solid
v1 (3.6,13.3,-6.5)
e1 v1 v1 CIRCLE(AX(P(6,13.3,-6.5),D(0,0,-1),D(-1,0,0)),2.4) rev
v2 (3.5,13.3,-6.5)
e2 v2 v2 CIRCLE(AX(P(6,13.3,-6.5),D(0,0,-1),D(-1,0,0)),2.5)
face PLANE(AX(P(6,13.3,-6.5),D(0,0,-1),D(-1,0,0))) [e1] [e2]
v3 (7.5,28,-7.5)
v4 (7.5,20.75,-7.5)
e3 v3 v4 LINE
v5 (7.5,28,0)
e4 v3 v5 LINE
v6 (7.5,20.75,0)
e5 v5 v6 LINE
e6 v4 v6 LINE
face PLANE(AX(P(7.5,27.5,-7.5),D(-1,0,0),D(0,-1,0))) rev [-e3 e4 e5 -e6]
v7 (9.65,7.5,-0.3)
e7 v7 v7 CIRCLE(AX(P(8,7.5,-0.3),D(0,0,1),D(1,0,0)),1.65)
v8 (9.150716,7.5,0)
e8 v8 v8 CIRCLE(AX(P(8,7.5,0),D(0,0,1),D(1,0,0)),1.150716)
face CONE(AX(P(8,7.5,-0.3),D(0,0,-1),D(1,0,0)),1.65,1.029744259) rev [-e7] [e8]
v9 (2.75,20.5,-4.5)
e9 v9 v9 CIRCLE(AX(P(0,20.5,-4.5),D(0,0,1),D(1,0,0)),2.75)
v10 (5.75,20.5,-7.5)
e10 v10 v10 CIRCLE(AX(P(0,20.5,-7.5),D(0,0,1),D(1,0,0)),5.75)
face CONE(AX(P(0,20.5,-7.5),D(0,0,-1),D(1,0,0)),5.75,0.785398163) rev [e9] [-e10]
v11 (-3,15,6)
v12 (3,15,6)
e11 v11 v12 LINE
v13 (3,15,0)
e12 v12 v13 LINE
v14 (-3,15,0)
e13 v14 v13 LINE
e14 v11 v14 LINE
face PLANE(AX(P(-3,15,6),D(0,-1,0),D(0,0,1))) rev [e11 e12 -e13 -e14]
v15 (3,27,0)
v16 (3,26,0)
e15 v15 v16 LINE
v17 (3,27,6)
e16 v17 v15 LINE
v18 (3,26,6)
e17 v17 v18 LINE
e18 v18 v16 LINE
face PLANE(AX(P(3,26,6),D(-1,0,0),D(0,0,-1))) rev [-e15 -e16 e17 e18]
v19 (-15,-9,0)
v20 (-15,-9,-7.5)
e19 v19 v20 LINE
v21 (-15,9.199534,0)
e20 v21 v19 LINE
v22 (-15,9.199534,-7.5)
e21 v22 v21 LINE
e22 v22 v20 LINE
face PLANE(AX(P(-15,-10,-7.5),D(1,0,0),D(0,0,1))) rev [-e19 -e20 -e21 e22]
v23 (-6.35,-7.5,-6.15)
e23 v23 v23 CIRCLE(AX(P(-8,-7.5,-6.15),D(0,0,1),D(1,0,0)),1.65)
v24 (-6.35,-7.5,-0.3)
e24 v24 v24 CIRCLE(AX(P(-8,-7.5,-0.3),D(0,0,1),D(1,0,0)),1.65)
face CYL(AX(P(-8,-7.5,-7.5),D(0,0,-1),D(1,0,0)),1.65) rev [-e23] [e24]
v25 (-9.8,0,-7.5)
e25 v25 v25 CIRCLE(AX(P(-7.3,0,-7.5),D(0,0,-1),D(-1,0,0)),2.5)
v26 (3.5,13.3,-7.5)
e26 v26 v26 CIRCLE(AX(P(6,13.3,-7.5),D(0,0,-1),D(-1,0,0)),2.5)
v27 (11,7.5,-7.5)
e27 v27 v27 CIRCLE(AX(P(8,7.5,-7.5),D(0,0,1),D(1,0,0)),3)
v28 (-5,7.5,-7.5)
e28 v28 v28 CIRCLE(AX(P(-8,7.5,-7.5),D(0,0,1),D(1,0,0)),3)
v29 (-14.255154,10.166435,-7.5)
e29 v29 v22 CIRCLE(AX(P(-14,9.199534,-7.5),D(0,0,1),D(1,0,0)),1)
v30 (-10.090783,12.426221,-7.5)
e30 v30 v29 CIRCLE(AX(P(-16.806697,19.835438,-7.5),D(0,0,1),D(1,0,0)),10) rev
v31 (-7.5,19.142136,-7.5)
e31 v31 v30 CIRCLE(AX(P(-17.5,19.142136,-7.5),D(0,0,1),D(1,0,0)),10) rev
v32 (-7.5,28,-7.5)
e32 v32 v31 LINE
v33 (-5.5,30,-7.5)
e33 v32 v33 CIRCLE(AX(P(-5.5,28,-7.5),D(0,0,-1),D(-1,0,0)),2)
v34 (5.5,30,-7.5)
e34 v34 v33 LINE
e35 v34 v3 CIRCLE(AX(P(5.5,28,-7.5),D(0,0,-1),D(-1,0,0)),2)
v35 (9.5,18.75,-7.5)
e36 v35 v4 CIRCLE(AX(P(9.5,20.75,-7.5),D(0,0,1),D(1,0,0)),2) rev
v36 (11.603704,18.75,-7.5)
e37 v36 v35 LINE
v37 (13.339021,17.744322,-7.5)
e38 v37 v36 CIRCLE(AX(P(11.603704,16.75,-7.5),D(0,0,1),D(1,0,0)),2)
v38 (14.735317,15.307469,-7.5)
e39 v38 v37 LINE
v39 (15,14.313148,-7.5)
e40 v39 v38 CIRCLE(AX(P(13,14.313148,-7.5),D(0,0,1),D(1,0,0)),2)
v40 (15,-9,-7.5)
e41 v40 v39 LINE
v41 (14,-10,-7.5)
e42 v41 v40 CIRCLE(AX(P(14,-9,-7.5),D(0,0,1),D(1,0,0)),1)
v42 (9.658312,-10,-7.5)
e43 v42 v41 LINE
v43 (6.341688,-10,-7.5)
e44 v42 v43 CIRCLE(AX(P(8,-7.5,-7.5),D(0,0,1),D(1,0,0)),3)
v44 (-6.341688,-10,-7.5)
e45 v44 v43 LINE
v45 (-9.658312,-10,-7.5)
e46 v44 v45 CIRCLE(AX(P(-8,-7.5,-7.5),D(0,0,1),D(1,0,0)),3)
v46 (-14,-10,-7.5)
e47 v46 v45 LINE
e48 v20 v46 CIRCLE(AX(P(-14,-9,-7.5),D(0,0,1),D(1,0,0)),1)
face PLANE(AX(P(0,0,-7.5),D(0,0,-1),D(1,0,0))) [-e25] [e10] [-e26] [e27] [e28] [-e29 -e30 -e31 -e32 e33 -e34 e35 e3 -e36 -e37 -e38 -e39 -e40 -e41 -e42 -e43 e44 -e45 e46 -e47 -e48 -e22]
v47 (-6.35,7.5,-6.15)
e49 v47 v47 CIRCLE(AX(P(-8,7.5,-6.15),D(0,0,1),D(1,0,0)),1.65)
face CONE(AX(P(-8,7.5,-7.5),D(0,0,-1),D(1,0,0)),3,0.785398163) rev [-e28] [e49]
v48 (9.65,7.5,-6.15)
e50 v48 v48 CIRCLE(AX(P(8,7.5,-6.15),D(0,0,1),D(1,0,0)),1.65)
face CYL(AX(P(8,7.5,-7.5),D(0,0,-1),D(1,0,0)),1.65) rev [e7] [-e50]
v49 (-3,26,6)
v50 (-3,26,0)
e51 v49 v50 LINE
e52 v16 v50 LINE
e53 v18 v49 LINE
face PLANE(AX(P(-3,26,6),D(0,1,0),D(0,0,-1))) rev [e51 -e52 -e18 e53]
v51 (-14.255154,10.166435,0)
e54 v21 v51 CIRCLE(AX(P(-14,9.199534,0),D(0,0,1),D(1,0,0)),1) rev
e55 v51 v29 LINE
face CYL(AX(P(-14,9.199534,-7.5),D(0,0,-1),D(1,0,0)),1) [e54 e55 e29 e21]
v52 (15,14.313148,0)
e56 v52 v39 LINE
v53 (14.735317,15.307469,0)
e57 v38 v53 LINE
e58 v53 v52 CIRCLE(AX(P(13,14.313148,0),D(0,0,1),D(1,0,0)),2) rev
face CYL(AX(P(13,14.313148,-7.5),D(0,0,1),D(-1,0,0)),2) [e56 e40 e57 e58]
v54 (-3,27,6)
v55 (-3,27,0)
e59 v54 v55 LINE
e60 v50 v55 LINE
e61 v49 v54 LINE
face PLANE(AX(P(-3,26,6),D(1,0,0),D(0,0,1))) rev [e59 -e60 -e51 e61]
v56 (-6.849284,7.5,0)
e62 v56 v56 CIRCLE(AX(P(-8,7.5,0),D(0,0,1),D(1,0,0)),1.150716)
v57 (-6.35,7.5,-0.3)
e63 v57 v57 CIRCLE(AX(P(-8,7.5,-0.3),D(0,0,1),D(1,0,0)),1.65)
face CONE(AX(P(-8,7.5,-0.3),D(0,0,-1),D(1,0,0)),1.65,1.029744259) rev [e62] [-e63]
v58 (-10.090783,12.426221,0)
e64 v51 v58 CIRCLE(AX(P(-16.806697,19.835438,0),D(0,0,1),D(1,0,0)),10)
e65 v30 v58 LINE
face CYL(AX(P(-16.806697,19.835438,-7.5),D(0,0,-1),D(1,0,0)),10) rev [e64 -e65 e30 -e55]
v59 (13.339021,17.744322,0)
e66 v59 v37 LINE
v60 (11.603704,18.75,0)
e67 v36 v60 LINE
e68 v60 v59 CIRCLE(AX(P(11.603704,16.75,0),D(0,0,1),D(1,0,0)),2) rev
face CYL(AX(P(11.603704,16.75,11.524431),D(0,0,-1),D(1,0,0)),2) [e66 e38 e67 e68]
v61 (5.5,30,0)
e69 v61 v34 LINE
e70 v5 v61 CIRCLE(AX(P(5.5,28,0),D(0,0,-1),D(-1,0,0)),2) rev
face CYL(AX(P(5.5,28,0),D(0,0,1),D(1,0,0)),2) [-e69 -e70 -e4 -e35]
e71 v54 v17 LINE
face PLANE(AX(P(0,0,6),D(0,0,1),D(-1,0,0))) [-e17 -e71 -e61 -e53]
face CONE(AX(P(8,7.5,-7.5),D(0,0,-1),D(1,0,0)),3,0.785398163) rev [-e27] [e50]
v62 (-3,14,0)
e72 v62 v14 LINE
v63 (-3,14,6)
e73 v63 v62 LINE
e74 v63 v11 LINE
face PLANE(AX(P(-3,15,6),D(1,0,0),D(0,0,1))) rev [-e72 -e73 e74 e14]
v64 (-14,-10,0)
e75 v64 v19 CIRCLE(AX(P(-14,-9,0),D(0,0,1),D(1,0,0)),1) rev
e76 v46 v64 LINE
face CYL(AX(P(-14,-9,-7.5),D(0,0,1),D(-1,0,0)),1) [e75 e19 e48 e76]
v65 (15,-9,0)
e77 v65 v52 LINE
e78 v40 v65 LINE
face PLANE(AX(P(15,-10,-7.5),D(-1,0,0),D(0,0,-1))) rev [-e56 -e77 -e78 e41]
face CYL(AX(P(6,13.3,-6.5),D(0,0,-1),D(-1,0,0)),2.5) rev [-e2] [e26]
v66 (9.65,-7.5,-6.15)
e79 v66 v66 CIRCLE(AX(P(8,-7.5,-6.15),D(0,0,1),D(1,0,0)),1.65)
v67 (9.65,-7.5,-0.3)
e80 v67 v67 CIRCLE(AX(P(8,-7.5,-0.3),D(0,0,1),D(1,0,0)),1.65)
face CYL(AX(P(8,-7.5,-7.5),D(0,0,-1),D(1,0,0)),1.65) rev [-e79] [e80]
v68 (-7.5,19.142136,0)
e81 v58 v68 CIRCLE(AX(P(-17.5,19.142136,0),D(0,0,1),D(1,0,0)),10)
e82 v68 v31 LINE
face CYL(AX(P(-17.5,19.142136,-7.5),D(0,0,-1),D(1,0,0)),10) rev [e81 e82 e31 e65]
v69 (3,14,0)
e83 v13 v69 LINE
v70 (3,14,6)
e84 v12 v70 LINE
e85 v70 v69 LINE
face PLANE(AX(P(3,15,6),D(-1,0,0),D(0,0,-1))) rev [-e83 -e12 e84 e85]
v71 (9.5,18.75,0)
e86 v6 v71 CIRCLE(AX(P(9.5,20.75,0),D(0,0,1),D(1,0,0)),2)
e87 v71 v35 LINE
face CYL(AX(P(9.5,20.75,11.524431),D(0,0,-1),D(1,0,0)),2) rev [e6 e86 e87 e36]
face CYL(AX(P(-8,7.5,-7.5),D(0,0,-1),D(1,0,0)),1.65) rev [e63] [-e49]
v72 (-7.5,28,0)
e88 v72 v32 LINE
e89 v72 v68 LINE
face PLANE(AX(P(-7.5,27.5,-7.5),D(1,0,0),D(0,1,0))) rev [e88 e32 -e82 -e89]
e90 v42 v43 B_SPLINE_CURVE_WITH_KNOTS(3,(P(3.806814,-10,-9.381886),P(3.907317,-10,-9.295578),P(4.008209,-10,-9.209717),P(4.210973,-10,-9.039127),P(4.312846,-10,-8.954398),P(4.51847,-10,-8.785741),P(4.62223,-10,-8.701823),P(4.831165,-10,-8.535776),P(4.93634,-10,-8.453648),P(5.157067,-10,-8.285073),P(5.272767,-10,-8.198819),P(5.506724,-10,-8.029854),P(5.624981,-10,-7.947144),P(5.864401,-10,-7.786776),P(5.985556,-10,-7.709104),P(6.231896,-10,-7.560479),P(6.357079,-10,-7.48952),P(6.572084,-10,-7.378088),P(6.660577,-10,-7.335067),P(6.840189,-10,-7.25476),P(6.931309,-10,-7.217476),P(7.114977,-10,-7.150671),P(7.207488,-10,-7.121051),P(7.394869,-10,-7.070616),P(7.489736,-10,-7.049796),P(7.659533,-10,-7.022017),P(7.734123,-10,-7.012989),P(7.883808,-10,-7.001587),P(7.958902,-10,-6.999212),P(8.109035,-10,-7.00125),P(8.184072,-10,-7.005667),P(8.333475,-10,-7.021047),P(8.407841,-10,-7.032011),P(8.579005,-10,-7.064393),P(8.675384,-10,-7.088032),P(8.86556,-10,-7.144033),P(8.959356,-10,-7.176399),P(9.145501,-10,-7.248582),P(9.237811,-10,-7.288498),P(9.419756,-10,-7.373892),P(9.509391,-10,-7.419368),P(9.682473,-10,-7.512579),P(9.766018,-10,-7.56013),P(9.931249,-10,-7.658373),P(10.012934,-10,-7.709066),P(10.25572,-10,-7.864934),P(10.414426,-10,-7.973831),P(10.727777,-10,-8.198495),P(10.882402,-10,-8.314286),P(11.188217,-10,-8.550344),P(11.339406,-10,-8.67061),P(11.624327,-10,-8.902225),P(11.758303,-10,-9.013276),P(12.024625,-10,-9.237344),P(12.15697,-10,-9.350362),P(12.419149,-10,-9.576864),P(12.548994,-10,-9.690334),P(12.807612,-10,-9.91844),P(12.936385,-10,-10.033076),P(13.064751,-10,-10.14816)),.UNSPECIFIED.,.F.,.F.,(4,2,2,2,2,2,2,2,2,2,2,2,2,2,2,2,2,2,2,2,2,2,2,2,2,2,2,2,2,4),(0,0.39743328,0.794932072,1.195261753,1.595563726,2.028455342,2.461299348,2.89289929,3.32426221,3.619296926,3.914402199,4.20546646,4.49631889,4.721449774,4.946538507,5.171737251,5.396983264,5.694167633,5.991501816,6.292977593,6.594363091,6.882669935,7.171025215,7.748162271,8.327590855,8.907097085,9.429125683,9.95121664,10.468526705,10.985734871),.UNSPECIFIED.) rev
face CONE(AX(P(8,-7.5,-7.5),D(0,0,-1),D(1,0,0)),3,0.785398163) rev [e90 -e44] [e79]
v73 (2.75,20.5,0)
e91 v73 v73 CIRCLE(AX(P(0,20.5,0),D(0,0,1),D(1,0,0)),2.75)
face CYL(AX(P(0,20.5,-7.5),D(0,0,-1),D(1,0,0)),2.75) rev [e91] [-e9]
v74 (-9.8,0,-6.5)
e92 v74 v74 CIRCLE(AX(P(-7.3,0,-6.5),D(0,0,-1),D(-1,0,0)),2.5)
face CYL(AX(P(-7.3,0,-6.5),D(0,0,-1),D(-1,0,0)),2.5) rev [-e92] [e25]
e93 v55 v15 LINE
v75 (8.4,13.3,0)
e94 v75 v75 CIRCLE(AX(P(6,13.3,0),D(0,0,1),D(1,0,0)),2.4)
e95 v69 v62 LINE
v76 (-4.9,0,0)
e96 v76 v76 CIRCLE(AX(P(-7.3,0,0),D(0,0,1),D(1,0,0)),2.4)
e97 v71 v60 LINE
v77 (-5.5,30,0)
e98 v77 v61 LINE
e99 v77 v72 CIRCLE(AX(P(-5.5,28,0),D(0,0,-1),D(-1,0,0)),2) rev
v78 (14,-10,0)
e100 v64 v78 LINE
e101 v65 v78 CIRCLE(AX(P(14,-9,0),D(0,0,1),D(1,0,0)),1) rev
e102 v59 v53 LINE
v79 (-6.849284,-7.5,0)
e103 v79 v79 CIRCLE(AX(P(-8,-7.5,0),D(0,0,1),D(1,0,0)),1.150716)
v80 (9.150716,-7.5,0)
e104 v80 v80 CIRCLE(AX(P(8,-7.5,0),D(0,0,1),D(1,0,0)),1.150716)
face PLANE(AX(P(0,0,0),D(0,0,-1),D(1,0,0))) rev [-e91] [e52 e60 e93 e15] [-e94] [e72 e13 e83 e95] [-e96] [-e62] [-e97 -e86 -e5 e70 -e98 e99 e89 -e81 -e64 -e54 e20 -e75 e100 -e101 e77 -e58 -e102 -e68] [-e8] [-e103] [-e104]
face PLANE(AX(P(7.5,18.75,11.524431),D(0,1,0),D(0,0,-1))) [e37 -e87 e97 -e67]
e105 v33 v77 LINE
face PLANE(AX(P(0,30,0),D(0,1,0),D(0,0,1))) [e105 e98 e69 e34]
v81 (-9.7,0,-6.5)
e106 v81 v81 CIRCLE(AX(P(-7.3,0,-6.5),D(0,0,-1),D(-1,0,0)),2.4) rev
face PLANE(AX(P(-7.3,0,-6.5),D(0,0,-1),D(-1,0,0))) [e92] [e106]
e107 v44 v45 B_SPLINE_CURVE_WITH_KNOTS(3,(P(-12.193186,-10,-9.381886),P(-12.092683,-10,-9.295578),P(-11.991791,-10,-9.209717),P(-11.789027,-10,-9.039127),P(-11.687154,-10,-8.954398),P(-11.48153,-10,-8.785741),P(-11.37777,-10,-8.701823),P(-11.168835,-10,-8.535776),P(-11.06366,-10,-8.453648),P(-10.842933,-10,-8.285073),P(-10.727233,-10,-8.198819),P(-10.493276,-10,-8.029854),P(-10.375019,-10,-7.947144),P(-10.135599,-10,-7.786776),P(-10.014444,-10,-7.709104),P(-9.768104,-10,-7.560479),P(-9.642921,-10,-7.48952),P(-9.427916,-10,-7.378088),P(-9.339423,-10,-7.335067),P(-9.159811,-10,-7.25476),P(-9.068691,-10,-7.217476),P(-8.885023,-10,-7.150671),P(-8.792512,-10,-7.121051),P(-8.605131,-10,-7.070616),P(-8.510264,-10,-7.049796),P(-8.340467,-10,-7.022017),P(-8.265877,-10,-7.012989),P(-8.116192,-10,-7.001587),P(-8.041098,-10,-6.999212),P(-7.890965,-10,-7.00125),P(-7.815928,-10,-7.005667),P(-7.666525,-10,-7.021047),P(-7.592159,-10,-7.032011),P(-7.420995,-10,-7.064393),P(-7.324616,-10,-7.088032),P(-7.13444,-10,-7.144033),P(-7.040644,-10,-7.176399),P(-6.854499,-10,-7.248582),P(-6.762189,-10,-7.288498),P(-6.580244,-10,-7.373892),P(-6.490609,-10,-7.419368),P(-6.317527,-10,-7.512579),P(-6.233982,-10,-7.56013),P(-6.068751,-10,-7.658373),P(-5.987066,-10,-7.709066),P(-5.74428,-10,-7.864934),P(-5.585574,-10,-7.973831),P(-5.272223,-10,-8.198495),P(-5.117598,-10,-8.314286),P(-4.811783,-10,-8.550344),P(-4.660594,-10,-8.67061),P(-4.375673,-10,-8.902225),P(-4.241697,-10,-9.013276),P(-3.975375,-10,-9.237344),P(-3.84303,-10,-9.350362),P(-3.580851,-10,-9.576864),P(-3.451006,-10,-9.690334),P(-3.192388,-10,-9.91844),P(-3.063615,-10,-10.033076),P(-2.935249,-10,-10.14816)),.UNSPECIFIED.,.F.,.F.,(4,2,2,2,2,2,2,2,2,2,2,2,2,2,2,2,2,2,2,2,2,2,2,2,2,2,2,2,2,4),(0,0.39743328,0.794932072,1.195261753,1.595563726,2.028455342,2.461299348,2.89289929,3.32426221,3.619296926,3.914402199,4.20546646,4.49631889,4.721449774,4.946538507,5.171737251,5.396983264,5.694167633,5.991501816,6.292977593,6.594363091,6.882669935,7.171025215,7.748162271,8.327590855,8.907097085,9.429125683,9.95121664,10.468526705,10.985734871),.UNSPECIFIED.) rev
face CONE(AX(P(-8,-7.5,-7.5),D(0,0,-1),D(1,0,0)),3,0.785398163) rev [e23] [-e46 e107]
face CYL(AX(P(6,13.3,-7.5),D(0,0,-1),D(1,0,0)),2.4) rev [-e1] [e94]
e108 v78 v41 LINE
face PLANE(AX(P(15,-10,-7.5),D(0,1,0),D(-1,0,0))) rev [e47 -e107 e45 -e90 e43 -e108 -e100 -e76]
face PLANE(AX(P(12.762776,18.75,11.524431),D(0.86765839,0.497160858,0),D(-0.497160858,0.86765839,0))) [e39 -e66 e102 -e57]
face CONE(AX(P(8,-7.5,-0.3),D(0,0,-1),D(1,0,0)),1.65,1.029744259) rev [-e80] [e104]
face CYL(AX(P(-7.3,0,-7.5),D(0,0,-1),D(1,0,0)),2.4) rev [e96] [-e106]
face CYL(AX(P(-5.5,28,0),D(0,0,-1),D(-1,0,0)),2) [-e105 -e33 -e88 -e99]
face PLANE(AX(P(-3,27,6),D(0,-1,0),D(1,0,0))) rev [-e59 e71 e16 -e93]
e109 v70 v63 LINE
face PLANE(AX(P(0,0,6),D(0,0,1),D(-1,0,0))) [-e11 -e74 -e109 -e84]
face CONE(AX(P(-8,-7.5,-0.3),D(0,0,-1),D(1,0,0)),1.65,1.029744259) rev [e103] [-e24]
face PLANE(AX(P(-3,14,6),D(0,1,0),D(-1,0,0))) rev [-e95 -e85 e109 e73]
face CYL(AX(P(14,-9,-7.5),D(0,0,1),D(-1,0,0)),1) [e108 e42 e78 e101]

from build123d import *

# Parameters (mm, degrees)
SKETCH_1_W                   = 30
SKETCH_1_H                   = 20
EXTRUDE_1_DEPTH              = 7.5
SKETCH_5_W                   = 15
SKETCH_5_H                   = 7.5
EXTRUDE_2_DEPTH              = 17.5
SKETCH_6_W                   = 6
SKETCH_6_H                   = 1
EXTRUDE_3_DEPTH              = 6
HOLE_WIZARD_M6_1_D           = 5.5
HOLE_WIZARD_M6_1_CSINK_D     = 11.5
HOLE_WIZARD_M6_1_CSINK_ANGLE = 90
F_4_0MM_1_D                  = 4.8
F_4_0MM_1_DEPTH              = 7.5
F_4_0MM_1_TIP                = 1.442065486
EXTRUDE_4_DEPTH              = 7.5
F_4_0MM_2_D                  = 4.8
EXTRUDE_5_DEPTH              = 7.5
FILLET_1_R                   = 10
MOVE_BODY_1_OUTLINE_R        = 2.4
MOVE_BODY_1_OUTLINE_W        = 6
MOVE_BODY_1_OUTLINE_H        = 1
MOVE_BODY_1_OUTLINE_R_2      = 2.75
MOVE_BODY_1_DEPTH            = 7.5
MOVE_START                   = 6
MOVE_BODY_1_2_OUTLINE_W      = 6
MOVE_BODY_1_2_OUTLINE_H      = 1
MOVE_BODY_1_2_DEPTH          = 1.5
MOVE_START_2                 = -6.1500001
MOVE_BODY_1_3_OUTLINE_R      = 1.65
MOVE_BODY_1_3_OUTLINE_R_2    = 2.4
MOVE_BODY_1_3_OUTLINE_R_3    = 2.75
MOVE_BODY_1_3_DEPTH          = 6.1500001
MOVE_START_3                 = -7.5
MOVE_BODY_1_4_DEPTH          = 1.5
MOVE_BODY_1_5_OUTLINE_R      = 2.4
MOVE_BODY_1_5_OUTLINE_R_2    = 2.75
MOVE_BODY_1_5_DEPTH          = 1.3499999
MOVE_START_4                 = -0.3000001
MOVE_BODY_1_6_OUTLINE_R      = 2.4
MOVE_BODY_1_6_OUTLINE_R_2    = 2.75
MOVE_BODY_1_6_DEPTH          = 0.3000001
SKETCH_28_W                  = 15
SKETCH_28_H                  = 7.5
EXTRUDE_6_DEPTH              = 2.5
CUT_EXTRUDE_START            = -8
CUT_EXTRUDE_1_DEPTH          = 9
CUT_EXTRUDE_START_2          = -1
CUT_EXTRUDE_1_2_OUTLINE_R    = 2.5
CUT_EXTRUDE_1_2_OUTLINE_R_2  = 2.4
CUT_EXTRUDE_1_2_DEPTH        = 2


with BuildPart() as part:
    # 草图1 → 凸台-拉伸1 (new body)
    with BuildSketch(Plane.XY):
        Rectangle(SKETCH_1_W, SKETCH_1_H)
    extrude(amount=EXTRUDE_1_DEPTH)

    # 草图5 → 凸台-拉伸2 (add)
    with BuildSketch(Plane(origin=(0, 10, 0), x_dir=(1, 0, 0), z_dir=(0, 1, 0))):
        with Locations((0, -3.75)):
            Rectangle(SKETCH_5_W, SKETCH_5_H)
    extrude(amount=EXTRUDE_2_DEPTH)

    # 草图6 → 凸台-拉伸3 (add)
    with BuildSketch(Plane(origin=(0, 0, 0), x_dir=(-1, 0, 0), z_dir=(0, 0, -1))):
        with Locations((0, 26.5)):
            Rectangle(SKETCH_6_W, SKETCH_6_H)
        with Locations((0, 14.5)):
            Rectangle(SKETCH_6_W, SKETCH_6_H)
    extrude(amount=EXTRUDE_3_DEPTH)

    # M6 内六角花形半沉头螺钉的锥形沉头孔1 (through all)
    with Locations(Plane.XY.offset(7.5)):
        with Locations((0, 20.5)):
            CounterSinkHole(HOLE_WIZARD_M6_1_D / 2, HOLE_WIZARD_M6_1_CSINK_D / 2, counter_sink_angle=HOLE_WIZARD_M6_1_CSINK_ANGLE)

    # Ø4.0mm 暗销孔1
    with Locations(Plane.XY.offset(7.5)):
        with Locations((-7.3, 0)):
            Hole(F_4_0MM_1_D / 2, depth=F_4_0MM_1_DEPTH)
            with Locations((0, 0, -(F_4_0MM_1_DEPTH + F_4_0MM_1_TIP / 2))):  # 118° drill point
                Cone(0, F_4_0MM_1_D / 2, F_4_0MM_1_TIP, mode=Mode.SUBTRACT)

    # 草图15 → 凸台-拉伸4 (add)
    with BuildSketch(Plane.XY.offset(7.5)):
        Polygon((7.5, 18.75), (12.762776139, 18.75), (15, 14.845537246), (15, 10), (7.5, 10), align=None)
    extrude(amount=-EXTRUDE_4_DEPTH)

    # Ø4.0mm 暗销孔2 (through all)
    with Locations(Plane.XY.offset(7.5)):
        with Locations((6, 13.3)):
            Hole(F_4_0MM_2_D / 2)

    # 草图23 → 凸台-拉伸5 (add)
    with BuildSketch(Plane.XY.offset(7.5)):
        Polygon((-7.5, 15), (-12.5, 10), (-7.5, 10), align=None)
    extrude(amount=-EXTRUDE_5_DEPTH)

    # M6 内六角花形半沉头螺钉的锥形沉头孔3: read off the stored shape, not the designer's step
    # M6 内六角花形半沉头螺钉的锥形沉头孔3 outline → M6 内六角花形半沉头螺钉的锥形沉头孔3 (revolve, cut)
    with BuildSketch(Plane(origin=(-8, 7.5, 0), x_dir=(1, 0, 0), z_dir=(0, -1, 0))):
        Polygon((0, 7.5), (0, 0), (1.150716155, 0), (1.65, 0.3), (1.65, 6.15), (3, 7.5), align=None)
    hole_wizard_m6_3 = revolve(axis=Axis((-8, 7.5, 0), (0, 0, 1)), mode=Mode.SUBTRACT)

    # 镜向3: M6 内六角花形半沉头螺钉的锥形沉头孔3 across plane
    add(hole_wizard_m6_3.mirror(Plane.ZX), mode=Mode.SUBTRACT)

    # 镜向3 at the second plane: M6 内六角花形半沉头螺钉的锥形沉头孔3 across plane
    add(hole_wizard_m6_3.mirror(Plane(origin=(0, 0, 0), x_dir=(0, 0, 1), z_dir=(1, 0, 0))), mode=Mode.SUBTRACT)

    # 镜向3 at the second plane copy 1 sket → 镜向3 at the second plane copy 1 (revolve, cut)
    with BuildSketch(Plane(origin=(8, -7.5, 0), x_dir=(-1, 0, 0), z_dir=(0, 1, 0))):
        Polygon((0, 7.5), (0, 0), (1.150716155, 0), (1.65, 0.3), (1.65, 6.15), (3, 7.5), align=None)
    revolve(axis=Axis((8, -7.5, 0), (0, 0, 1)), mode=Mode.SUBTRACT)

    # 圆角1
    # the kernel refuses this fillet: 10 mm, written as the material it adds along each edge
    with BuildSketch(Plane(origin=(-12.5, 10, 7.5), x_dir=(-1, 0, 0), z_dir=(0, 0, -1))) as fillet_1_piece_1:
        with BuildLine():
            CenterArc((4.306697434, 9.83543819), FILLET_1_R, 225, 34.591227114)
            Line((-2.764370378, 2.764370378), (-2.905791734, 2.622949022))
            Line((-2.905791734, 2.622949022), (-0.141421356, -0.141421356))
            Line((-0.141421356, -0.141421356), (0, -0.2))
            ThreePointArc((0, -0.2), (1.25, -0.2), (2.463866051, -0.196708764))
            Line((2.463866051, -0.196708764), (2.5, 0))
        make_face()
    extrude(amount=7.5)
    with BuildSketch(Plane(origin=(-7.5, 15, 7.5), x_dir=(-0.7071067811865475, -0.7071067811865477, 0), z_dir=(0, 0, -1))) as fillet_1_piece_2:
        with BuildLine():
            CenterArc((FILLET_1_R * 0.414213562373, FILLET_1_R), FILLET_1_R, 225, 45)
            Line((-FILLET_1_R * 0.292893218813, FILLET_1_R * 0.292893218813), (-FILLET_1_R * 0.307035354437, FILLET_1_R * 0.27875108319))
            Line((-FILLET_1_R * 0.307035354437, FILLET_1_R * 0.27875108319), (-FILLET_1_R * 0.00828427124746, -FILLET_1_R * 0.02))
            Line((-FILLET_1_R * 0.00828427124746, -FILLET_1_R * 0.02), (FILLET_1_R * 0.414213562373, -FILLET_1_R * 0.02))
            Line((FILLET_1_R * 0.414213562373, -FILLET_1_R * 0.02), (FILLET_1_R * 0.414213562373, 0))
        make_face()
    extrude(amount=7.5)

    # Move Body 1: read off the stored shape, not the designer's step
    # Move Body 1 outline → Move Body 1 (cut)
    with BuildSketch(Plane.XY):
        with BuildLine():
            Line((-15, -10), (15, -10))
            Line((15, -10), (15, 14.845537246))
            Line((15, 14.845537246), (14.73531678, 15.307469462))
            Line((14.73531678, 15.307469462), (13.33902122, 17.744321716))
            Line((13.33902122, 17.744321716), (12.762776139, 18.75))
            Line((12.762776139, 18.75), (7.5, 18.75))
            Line((7.5, 18.75), (7.5, 27.5))
            Line((7.5, 27.5), (-7.5, 27.5))
            Line((-7.5, 27.5), (-7.5, 19.142135624))
            ThreePointArc((-7.5, 19.142135624), (-8.170150889, 15.542980782), (-10.090783115, 12.426221304))
            ThreePointArc((-10.090783115, 12.426221304), (-12.037200533, 11.046132226), (-14.255154312, 10.166434741))
            ThreePointArc((-14.255154312, 10.166434741), (-14.625988761, 10.076108823), (-15, 10))
            Line((-15, 10), (-15, -10))
        make_face()
        with Locations((-7.3, 0)):
            Circle(MOVE_BODY_1_OUTLINE_R, mode=Mode.SUBTRACT)
        with Locations((6, 13.3)):
            Circle(MOVE_BODY_1_OUTLINE_R, mode=Mode.SUBTRACT)
        with Locations((0, 14.5)):
            Rectangle(MOVE_BODY_1_OUTLINE_W, MOVE_BODY_1_OUTLINE_H, mode=Mode.SUBTRACT)
        with Locations((0, 20.5)):
            Circle(MOVE_BODY_1_OUTLINE_R_2, mode=Mode.SUBTRACT)
        with Locations((0, 26.5)):
            Rectangle(MOVE_BODY_1_OUTLINE_W, MOVE_BODY_1_OUTLINE_H, mode=Mode.SUBTRACT)
    extrude(amount=MOVE_BODY_1_DEPTH, mode=Mode.SUBTRACT)

    # Move Body 1 2 outline → Move Body 1 2 (cut)
    with BuildSketch(Plane.XY.offset(MOVE_START)):
        with Locations((0, 14.5)):
            Rectangle(MOVE_BODY_1_2_OUTLINE_W, MOVE_BODY_1_2_OUTLINE_H)
        with Locations((0, 26.5)):
            Rectangle(MOVE_BODY_1_2_OUTLINE_W, MOVE_BODY_1_2_OUTLINE_H)
    extrude(amount=MOVE_BODY_1_2_DEPTH, mode=Mode.SUBTRACT)

    # Move Body 1 3 outline → Move Body 1 3 (add)
    with BuildSketch(Plane.XY.offset(MOVE_START_2)):
        with BuildLine():
            Line((-15, 9.199534396), (-15, -9))
            ThreePointArc((-15, -9), (-14.707106781, -9.707106781), (-14, -10))
            Line((-14, -10), (14, -10))
            ThreePointArc((14, -10), (14.707106781, -9.707106781), (15, -9))
            Line((15, -9), (15, 14.313147746))
            ThreePointArc((15, 14.313147746), (14.932696763, 14.827621477), (14.73531678, 15.307469462))
            Line((14.73531678, 15.307469462), (13.33902122, 17.744321716))
            ThreePointArc((13.33902122, 17.744321716), (12.606539563, 18.480410852), (11.60370444, 18.75))
            Line((11.60370444, 18.75), (9.5, 18.75))
            ThreePointArc((9.5, 18.75), (8.085786438, 19.335786438), (7.5, 20.75))
            Line((7.5, 20.75), (7.5, 27.5))
            Line((7.5, 27.5), (-7.5, 27.5))
            Line((-7.5, 27.5), (-7.5, 19.142135624))
            ThreePointArc((-7.5, 19.142135624), (-8.170150889, 15.542980782), (-10.090783115, 12.426221304))
            ThreePointArc((-10.090783115, 12.426221304), (-12.037200533, 11.046132226), (-14.255154312, 10.166434741))
            ThreePointArc((-14.255154312, 10.166434741), (-14.792197675, 9.809798965), (-15, 9.199534396))
        make_face()
        with Locations((-8, -7.5)):
            Circle(MOVE_BODY_1_3_OUTLINE_R, mode=Mode.SUBTRACT)
        with Locations((-8, 7.5)):
            Circle(MOVE_BODY_1_3_OUTLINE_R, mode=Mode.SUBTRACT)
        with Locations((-7.3, 0)):
            Circle(MOVE_BODY_1_3_OUTLINE_R_2, mode=Mode.SUBTRACT)
        with Locations((8, -7.5)):
            Circle(MOVE_BODY_1_3_OUTLINE_R, mode=Mode.SUBTRACT)
        with Locations((8, 7.5)):
            Circle(MOVE_BODY_1_3_OUTLINE_R, mode=Mode.SUBTRACT)
        with Locations((6, 13.3)):
            Circle(MOVE_BODY_1_3_OUTLINE_R_2, mode=Mode.SUBTRACT)
        with Locations((0, 20.5)):
            Circle(MOVE_BODY_1_3_OUTLINE_R_3, mode=Mode.SUBTRACT)
    extrude(amount=MOVE_BODY_1_3_DEPTH)

    # Move Body 1 4 outline → Move Body 1 4 (add)
    with BuildSketch(Plane.XY.offset(MOVE_START_3)):
        with BuildLine():
            ThreePointArc((9.5, 18.75), (8.085786438, 19.335786438), (7.5, 20.75))
            Line((7.5, 20.75), (7.5, 18.75))
            Line((7.5, 18.75), (9.5, 18.75))
        make_face()
    extrude(amount=MOVE_BODY_1_4_DEPTH)

    # Move Body 1 5 outline → Move Body 1 5 (add)
    with BuildSketch(Plane.XY.offset(MOVE_START_3)):
        with BuildLine():
            Line((-15, 9.199534396), (-15, -9))
            ThreePointArc((-15, -9), (-14.707106781, -9.707106781), (-14, -10))
            Line((-14, -10), (14, -10))
            ThreePointArc((14, -10), (14.707106781, -9.707106781), (15, -9))
            Line((15, -9), (15, 14.313147746))
            ThreePointArc((15, 14.313147746), (14.932696763, 14.827621477), (14.73531678, 15.307469462))
            Line((14.73531678, 15.307469462), (13.33902122, 17.744321716))
            ThreePointArc((13.33902122, 17.744321716), (12.606539563, 18.480410852), (11.60370444, 18.75))
            Line((11.60370444, 18.75), (7.5, 18.75))
            Line((7.5, 18.75), (7.5, 27.5))
            Line((7.5, 27.5), (-7.5, 27.5))
            Line((-7.5, 27.5), (-7.5, 19.142135624))
            ThreePointArc((-7.5, 19.142135624), (-8.170150889, 15.542980782), (-10.090783115, 12.426221304))
            ThreePointArc((-10.090783115, 12.426221304), (-12.037200533, 11.046132226), (-14.255154312, 10.166434741))
            ThreePointArc((-14.255154312, 10.166434741), (-14.792197675, 9.809798965), (-15, 9.199534396))
        make_face()
        with Locations((-7.3, 0)):
            Circle(MOVE_BODY_1_5_OUTLINE_R, mode=Mode.SUBTRACT)
        with Locations((6, 13.3)):
            Circle(MOVE_BODY_1_5_OUTLINE_R, mode=Mode.SUBTRACT)
        with Locations((0, 20.5)):
            Circle(MOVE_BODY_1_5_OUTLINE_R_2, mode=Mode.SUBTRACT)
    extrude(amount=MOVE_BODY_1_5_DEPTH)

    # Move Body 1 6 outline → Move Body 1 6 (add)
    with BuildSketch(Plane.XY.offset(MOVE_START_4)):
        with BuildLine():
            Line((-15, 9.199534396), (-15, -9))
            ThreePointArc((-15, -9), (-14.707106781, -9.707106781), (-14, -10))
            Line((-14, -10), (14, -10))
            ThreePointArc((14, -10), (14.707106781, -9.707106781), (15, -9))
            Line((15, -9), (15, 14.313147746))
            ThreePointArc((15, 14.313147746), (14.932696763, 14.827621477), (14.73531678, 15.307469462))
            Line((14.73531678, 15.307469462), (13.33902122, 17.744321716))
            ThreePointArc((13.33902122, 17.744321716), (12.606539563, 18.480410852), (11.60370444, 18.75))
            Line((11.60370444, 18.75), (7.5, 18.75))
            Line((7.5, 18.75), (7.5, 27.5))
            Line((7.5, 27.5), (-7.5, 27.5))
            Line((-7.5, 27.5), (-7.5, 19.142135624))
            ThreePointArc((-7.5, 19.142135624), (-8.170150889, 15.542980782), (-10.090783115, 12.426221304))
            ThreePointArc((-10.090783115, 12.426221304), (-12.037200533, 11.046132226), (-14.255154312, 10.166434741))
            ThreePointArc((-14.255154312, 10.166434741), (-14.792197675, 9.809798965), (-15, 9.199534396))
        make_face()
        with Locations((-7.3, 0)):
            Circle(MOVE_BODY_1_6_OUTLINE_R, mode=Mode.SUBTRACT)
        with Locations((6, 13.3)):
            Circle(MOVE_BODY_1_6_OUTLINE_R, mode=Mode.SUBTRACT)
        with Locations((0, 20.5)):
            Circle(MOVE_BODY_1_6_OUTLINE_R_2, mode=Mode.SUBTRACT)
    extrude(amount=MOVE_BODY_1_6_DEPTH)

    # Move Body 1 7: loft between two sections, ruled curve by curve
    move_body_1_7_from = [
        Edge.make_three_point_arc((2.75, 20.5, -4.5), (0, 17.75, -4.5), (-2.75, 20.5, -4.5)),
        Edge.make_three_point_arc((-2.75, 20.5, -4.5), (0, 23.25, -4.5), (2.75, 20.5, -4.5)),
    ]
    move_body_1_7_to = [
        Edge.make_three_point_arc((5.75, 20.5, -7.5), (0, 14.75, -7.5), (-5.75, 20.5, -7.5)),
        Edge.make_three_point_arc((-5.75, 20.5, -7.5), (0, 26.25, -7.5), (5.75, 20.5, -7.5)),
    ]
    move_body_1_7 = Solid(Shell([*[Face.make_surface_from_curves(move_body_1_7_from[k], move_body_1_7_to[k]) for k in range(2)], Face(Wire(move_body_1_7_from)), Face(Wire(move_body_1_7_to))]))
    add(move_body_1_7, mode=Mode.SUBTRACT)

    # Move Body 1 8: loft between two sections, ruled curve by curve
    move_body_1_8_from = [
        Edge.make_three_point_arc((-6.849283845, 7.5, 0), (-8, 6.349283845, 0), (-9.150716155, 7.5, 0)),
        Edge.make_three_point_arc((-9.150716155, 7.5, 0), (-8, 8.650716155, 0), (-6.849283845, 7.5, 0)),
    ]
    move_body_1_8_to = [
        Edge.make_three_point_arc((-6.35, 7.5, -0.3), (-8, 5.85, -0.3), (-9.65, 7.5, -0.3)),
        Edge.make_three_point_arc((-9.65, 7.5, -0.3), (-8, 9.15, -0.3), (-6.35, 7.5, -0.3)),
    ]
    move_body_1_8 = Solid(Shell([*[Face.make_surface_from_curves(move_body_1_8_from[k], move_body_1_8_to[k]) for k in range(2)], Face(Wire(move_body_1_8_from)), Face(Wire(move_body_1_8_to))]))
    add(move_body_1_8, mode=Mode.SUBTRACT)

    # Move Body 1 9: loft between two sections, ruled curve by curve
    move_body_1_9_from = [
        Edge.make_three_point_arc((-6.35, 7.5, -6.15), (-8, 5.85, -6.15), (-9.65, 7.5, -6.15)),
        Edge.make_three_point_arc((-9.65, 7.5, -6.15), (-8, 9.15, -6.15), (-6.35, 7.5, -6.15)),
    ]
    move_body_1_9_to = [
        Edge.make_three_point_arc((-5, 7.5, -7.5), (-8, 4.5, -7.5), (-11, 7.5, -7.5)),
        Edge.make_three_point_arc((-11, 7.5, -7.5), (-8, 10.5, -7.5), (-5, 7.5, -7.5)),
    ]
    move_body_1_9 = Solid(Shell([*[Face.make_surface_from_curves(move_body_1_9_from[k], move_body_1_9_to[k]) for k in range(2)], Face(Wire(move_body_1_9_from)), Face(Wire(move_body_1_9_to))]))
    add(move_body_1_9, mode=Mode.SUBTRACT)

    # Move Body 1 10: loft between two sections, ruled curve by curve
    move_body_1_10_from = [
        Edge.make_three_point_arc((9.150716155, 7.5, 0), (8, 6.349283845, 0), (6.849283845, 7.5, 0)),
        Edge.make_three_point_arc((6.849283845, 7.5, 0), (8, 8.650716155, 0), (9.150716155, 7.5, 0)),
    ]
    move_body_1_10_to = [
        Edge.make_three_point_arc((9.65, 7.5, -0.3), (8, 5.85, -0.3), (6.35, 7.5, -0.3)),
        Edge.make_three_point_arc((6.35, 7.5, -0.3), (8, 9.15, -0.3), (9.65, 7.5, -0.3)),
    ]
    move_body_1_10 = Solid(Shell([*[Face.make_surface_from_curves(move_body_1_10_from[k], move_body_1_10_to[k]) for k in range(2)], Face(Wire(move_body_1_10_from)), Face(Wire(move_body_1_10_to))]))
    add(move_body_1_10, mode=Mode.SUBTRACT)

    # Move Body 1 11: loft between two sections, ruled curve by curve
    move_body_1_11_from = [
        Edge.make_three_point_arc((9.65, 7.5, -6.15), (8, 5.85, -6.15), (6.35, 7.5, -6.15)),
        Edge.make_three_point_arc((6.35, 7.5, -6.15), (8, 9.15, -6.15), (9.65, 7.5, -6.15)),
    ]
    move_body_1_11_to = [
        Edge.make_three_point_arc((11, 7.5, -7.5), (8, 4.5, -7.5), (5, 7.5, -7.5)),
        Edge.make_three_point_arc((5, 7.5, -7.5), (8, 10.5, -7.5), (11, 7.5, -7.5)),
    ]
    move_body_1_11 = Solid(Shell([*[Face.make_surface_from_curves(move_body_1_11_from[k], move_body_1_11_to[k]) for k in range(2)], Face(Wire(move_body_1_11_from)), Face(Wire(move_body_1_11_to))]))
    add(move_body_1_11, mode=Mode.SUBTRACT)

    # Move Body 1 12: loft between two sections, ruled curve by curve
    move_body_1_12_from = [
        Edge.make_three_point_arc((-6.849283845, -7.5, 0), (-8, -8.650716155, 0), (-9.150716155, -7.5, 0)),
        Edge.make_three_point_arc((-9.150716155, -7.5, 0), (-8, -6.349283845, 0), (-6.849283845, -7.5, 0)),
    ]
    move_body_1_12_to = [
        Edge.make_three_point_arc((-6.35, -7.5, -0.3), (-8, -9.15, -0.3), (-9.65, -7.5, -0.3)),
        Edge.make_three_point_arc((-9.65, -7.5, -0.3), (-8, -5.85, -0.3), (-6.35, -7.5, -0.3)),
    ]
    move_body_1_12 = Solid(Shell([*[Face.make_surface_from_curves(move_body_1_12_from[k], move_body_1_12_to[k]) for k in range(2)], Face(Wire(move_body_1_12_from)), Face(Wire(move_body_1_12_to))]))
    add(move_body_1_12, mode=Mode.SUBTRACT)

    # Move Body 1 13: loft between two sections, ruled curve by curve
    move_body_1_13_from = [
        Edge.make_three_point_arc((-6.35, -7.5, -6.15), (-8, -9.15, -6.15), (-9.65, -7.5, -6.15)),
        Edge.make_three_point_arc((-9.65, -7.5, -6.15), (-8, -5.85, -6.15), (-6.35, -7.5, -6.15)),
    ]
    move_body_1_13_to = [
        Edge.make_three_point_arc((-5, -7.5, -7.5), (-8, -10.5, -7.5), (-11, -7.5, -7.5)),
        Edge.make_three_point_arc((-11, -7.5, -7.5), (-8, -4.5, -7.5), (-5, -7.5, -7.5)),
    ]
    move_body_1_13 = Solid(Shell([*[Face.make_surface_from_curves(move_body_1_13_from[k], move_body_1_13_to[k]) for k in range(2)], Face(Wire(move_body_1_13_from)), Face(Wire(move_body_1_13_to))]))
    add(move_body_1_13, mode=Mode.SUBTRACT)

    # Move Body 1 14: loft between two sections, ruled curve by curve
    move_body_1_14_from = [
        Edge.make_three_point_arc((9.150716155, -7.5, 0), (8, -8.650716155, 0), (6.849283845, -7.5, 0)),
        Edge.make_three_point_arc((6.849283845, -7.5, 0), (8, -6.349283845, 0), (9.150716155, -7.5, 0)),
    ]
    move_body_1_14_to = [
        Edge.make_three_point_arc((9.65, -7.5, -0.3), (8, -9.15, -0.3), (6.35, -7.5, -0.3)),
        Edge.make_three_point_arc((6.35, -7.5, -0.3), (8, -5.85, -0.3), (9.65, -7.5, -0.3)),
    ]
    move_body_1_14 = Solid(Shell([*[Face.make_surface_from_curves(move_body_1_14_from[k], move_body_1_14_to[k]) for k in range(2)], Face(Wire(move_body_1_14_from)), Face(Wire(move_body_1_14_to))]))
    add(move_body_1_14, mode=Mode.SUBTRACT)

    # Move Body 1 15: loft between two sections, ruled curve by curve
    move_body_1_15_from = [
        Edge.make_three_point_arc((9.65, -7.5, -6.15), (8, -9.15, -6.15), (6.35, -7.5, -6.15)),
        Edge.make_three_point_arc((6.35, -7.5, -6.15), (8, -5.85, -6.15), (9.65, -7.5, -6.15)),
    ]
    move_body_1_15_to = [
        Edge.make_three_point_arc((11, -7.5, -7.5), (8, -10.5, -7.5), (5, -7.5, -7.5)),
        Edge.make_three_point_arc((5, -7.5, -7.5), (8, -4.5, -7.5), (11, -7.5, -7.5)),
    ]
    move_body_1_15 = Solid(Shell([*[Face.make_surface_from_curves(move_body_1_15_from[k], move_body_1_15_to[k]) for k in range(2)], Face(Wire(move_body_1_15_from)), Face(Wire(move_body_1_15_to))]))
    add(move_body_1_15, mode=Mode.SUBTRACT)

    # 草图28 → 凸台-拉伸6 (add)
    with BuildSketch(Plane(origin=(0, 27.5, 0), x_dir=(1, 0, 0), z_dir=(0, 1, 0))):
        with Locations((0, 3.75)):
            Rectangle(SKETCH_28_W, SKETCH_28_H)
    extrude(amount=EXTRUDE_6_DEPTH)

    # 切除-拉伸1: read off the stored shape, not the designer's step
    # 切除-拉伸1 outline → 切除-拉伸1 (cut)
    with BuildSketch(Plane(origin=(0, 0, -7.5), x_dir=(-1, 0, 0), z_dir=(0, 0, -1)).offset(CUT_EXTRUDE_START)):
        with BuildLine():
            Line((-7.5, 30), (-7.5, 28))
            ThreePointArc((-7.5, 28), (-6.914213562, 29.414213562), (-5.5, 30))
            Line((-5.5, 30), (-7.5, 30))
        make_face()
        with BuildLine():
            Line((7.5, 30), (5.5, 30))
            ThreePointArc((5.5, 30), (6.914213562, 29.414213562), (7.5, 28))
            Line((7.5, 28), (7.5, 30))
        make_face()
    extrude(amount=CUT_EXTRUDE_1_DEPTH, mode=Mode.SUBTRACT)

    # Cut-Extrude 1 2 outline → Cut-Extrude 1 2 (cut)
    # profile 1 of 2: a face of its own
    with BuildSketch(Plane(origin=(0, 0, -7.5), x_dir=(-1, 0, 0), z_dir=(0, 0, -1)).offset(CUT_EXTRUDE_START_2)):
        with Locations((-6, 13.3)):
            Circle(CUT_EXTRUDE_1_2_OUTLINE_R)
        with Locations((-6, 13.3)):
            Circle(CUT_EXTRUDE_1_2_OUTLINE_R_2, mode=Mode.SUBTRACT)
    # profile 2 of 2: a face of its own
    with BuildSketch(Plane(origin=(0, 0, -7.5), x_dir=(-1, 0, 0), z_dir=(0, 0, -1)).offset(CUT_EXTRUDE_START_2)):
        with Locations((7.3, 0)):
            Circle(CUT_EXTRUDE_1_2_OUTLINE_R)
        with Locations((7.3, 0)):
            Circle(CUT_EXTRUDE_1_2_OUTLINE_R_2, mode=Mode.SUBTRACT)
    extrude(amount=CUT_EXTRUDE_1_2_DEPTH, mode=Mode.SUBTRACT)


solid = part.part
